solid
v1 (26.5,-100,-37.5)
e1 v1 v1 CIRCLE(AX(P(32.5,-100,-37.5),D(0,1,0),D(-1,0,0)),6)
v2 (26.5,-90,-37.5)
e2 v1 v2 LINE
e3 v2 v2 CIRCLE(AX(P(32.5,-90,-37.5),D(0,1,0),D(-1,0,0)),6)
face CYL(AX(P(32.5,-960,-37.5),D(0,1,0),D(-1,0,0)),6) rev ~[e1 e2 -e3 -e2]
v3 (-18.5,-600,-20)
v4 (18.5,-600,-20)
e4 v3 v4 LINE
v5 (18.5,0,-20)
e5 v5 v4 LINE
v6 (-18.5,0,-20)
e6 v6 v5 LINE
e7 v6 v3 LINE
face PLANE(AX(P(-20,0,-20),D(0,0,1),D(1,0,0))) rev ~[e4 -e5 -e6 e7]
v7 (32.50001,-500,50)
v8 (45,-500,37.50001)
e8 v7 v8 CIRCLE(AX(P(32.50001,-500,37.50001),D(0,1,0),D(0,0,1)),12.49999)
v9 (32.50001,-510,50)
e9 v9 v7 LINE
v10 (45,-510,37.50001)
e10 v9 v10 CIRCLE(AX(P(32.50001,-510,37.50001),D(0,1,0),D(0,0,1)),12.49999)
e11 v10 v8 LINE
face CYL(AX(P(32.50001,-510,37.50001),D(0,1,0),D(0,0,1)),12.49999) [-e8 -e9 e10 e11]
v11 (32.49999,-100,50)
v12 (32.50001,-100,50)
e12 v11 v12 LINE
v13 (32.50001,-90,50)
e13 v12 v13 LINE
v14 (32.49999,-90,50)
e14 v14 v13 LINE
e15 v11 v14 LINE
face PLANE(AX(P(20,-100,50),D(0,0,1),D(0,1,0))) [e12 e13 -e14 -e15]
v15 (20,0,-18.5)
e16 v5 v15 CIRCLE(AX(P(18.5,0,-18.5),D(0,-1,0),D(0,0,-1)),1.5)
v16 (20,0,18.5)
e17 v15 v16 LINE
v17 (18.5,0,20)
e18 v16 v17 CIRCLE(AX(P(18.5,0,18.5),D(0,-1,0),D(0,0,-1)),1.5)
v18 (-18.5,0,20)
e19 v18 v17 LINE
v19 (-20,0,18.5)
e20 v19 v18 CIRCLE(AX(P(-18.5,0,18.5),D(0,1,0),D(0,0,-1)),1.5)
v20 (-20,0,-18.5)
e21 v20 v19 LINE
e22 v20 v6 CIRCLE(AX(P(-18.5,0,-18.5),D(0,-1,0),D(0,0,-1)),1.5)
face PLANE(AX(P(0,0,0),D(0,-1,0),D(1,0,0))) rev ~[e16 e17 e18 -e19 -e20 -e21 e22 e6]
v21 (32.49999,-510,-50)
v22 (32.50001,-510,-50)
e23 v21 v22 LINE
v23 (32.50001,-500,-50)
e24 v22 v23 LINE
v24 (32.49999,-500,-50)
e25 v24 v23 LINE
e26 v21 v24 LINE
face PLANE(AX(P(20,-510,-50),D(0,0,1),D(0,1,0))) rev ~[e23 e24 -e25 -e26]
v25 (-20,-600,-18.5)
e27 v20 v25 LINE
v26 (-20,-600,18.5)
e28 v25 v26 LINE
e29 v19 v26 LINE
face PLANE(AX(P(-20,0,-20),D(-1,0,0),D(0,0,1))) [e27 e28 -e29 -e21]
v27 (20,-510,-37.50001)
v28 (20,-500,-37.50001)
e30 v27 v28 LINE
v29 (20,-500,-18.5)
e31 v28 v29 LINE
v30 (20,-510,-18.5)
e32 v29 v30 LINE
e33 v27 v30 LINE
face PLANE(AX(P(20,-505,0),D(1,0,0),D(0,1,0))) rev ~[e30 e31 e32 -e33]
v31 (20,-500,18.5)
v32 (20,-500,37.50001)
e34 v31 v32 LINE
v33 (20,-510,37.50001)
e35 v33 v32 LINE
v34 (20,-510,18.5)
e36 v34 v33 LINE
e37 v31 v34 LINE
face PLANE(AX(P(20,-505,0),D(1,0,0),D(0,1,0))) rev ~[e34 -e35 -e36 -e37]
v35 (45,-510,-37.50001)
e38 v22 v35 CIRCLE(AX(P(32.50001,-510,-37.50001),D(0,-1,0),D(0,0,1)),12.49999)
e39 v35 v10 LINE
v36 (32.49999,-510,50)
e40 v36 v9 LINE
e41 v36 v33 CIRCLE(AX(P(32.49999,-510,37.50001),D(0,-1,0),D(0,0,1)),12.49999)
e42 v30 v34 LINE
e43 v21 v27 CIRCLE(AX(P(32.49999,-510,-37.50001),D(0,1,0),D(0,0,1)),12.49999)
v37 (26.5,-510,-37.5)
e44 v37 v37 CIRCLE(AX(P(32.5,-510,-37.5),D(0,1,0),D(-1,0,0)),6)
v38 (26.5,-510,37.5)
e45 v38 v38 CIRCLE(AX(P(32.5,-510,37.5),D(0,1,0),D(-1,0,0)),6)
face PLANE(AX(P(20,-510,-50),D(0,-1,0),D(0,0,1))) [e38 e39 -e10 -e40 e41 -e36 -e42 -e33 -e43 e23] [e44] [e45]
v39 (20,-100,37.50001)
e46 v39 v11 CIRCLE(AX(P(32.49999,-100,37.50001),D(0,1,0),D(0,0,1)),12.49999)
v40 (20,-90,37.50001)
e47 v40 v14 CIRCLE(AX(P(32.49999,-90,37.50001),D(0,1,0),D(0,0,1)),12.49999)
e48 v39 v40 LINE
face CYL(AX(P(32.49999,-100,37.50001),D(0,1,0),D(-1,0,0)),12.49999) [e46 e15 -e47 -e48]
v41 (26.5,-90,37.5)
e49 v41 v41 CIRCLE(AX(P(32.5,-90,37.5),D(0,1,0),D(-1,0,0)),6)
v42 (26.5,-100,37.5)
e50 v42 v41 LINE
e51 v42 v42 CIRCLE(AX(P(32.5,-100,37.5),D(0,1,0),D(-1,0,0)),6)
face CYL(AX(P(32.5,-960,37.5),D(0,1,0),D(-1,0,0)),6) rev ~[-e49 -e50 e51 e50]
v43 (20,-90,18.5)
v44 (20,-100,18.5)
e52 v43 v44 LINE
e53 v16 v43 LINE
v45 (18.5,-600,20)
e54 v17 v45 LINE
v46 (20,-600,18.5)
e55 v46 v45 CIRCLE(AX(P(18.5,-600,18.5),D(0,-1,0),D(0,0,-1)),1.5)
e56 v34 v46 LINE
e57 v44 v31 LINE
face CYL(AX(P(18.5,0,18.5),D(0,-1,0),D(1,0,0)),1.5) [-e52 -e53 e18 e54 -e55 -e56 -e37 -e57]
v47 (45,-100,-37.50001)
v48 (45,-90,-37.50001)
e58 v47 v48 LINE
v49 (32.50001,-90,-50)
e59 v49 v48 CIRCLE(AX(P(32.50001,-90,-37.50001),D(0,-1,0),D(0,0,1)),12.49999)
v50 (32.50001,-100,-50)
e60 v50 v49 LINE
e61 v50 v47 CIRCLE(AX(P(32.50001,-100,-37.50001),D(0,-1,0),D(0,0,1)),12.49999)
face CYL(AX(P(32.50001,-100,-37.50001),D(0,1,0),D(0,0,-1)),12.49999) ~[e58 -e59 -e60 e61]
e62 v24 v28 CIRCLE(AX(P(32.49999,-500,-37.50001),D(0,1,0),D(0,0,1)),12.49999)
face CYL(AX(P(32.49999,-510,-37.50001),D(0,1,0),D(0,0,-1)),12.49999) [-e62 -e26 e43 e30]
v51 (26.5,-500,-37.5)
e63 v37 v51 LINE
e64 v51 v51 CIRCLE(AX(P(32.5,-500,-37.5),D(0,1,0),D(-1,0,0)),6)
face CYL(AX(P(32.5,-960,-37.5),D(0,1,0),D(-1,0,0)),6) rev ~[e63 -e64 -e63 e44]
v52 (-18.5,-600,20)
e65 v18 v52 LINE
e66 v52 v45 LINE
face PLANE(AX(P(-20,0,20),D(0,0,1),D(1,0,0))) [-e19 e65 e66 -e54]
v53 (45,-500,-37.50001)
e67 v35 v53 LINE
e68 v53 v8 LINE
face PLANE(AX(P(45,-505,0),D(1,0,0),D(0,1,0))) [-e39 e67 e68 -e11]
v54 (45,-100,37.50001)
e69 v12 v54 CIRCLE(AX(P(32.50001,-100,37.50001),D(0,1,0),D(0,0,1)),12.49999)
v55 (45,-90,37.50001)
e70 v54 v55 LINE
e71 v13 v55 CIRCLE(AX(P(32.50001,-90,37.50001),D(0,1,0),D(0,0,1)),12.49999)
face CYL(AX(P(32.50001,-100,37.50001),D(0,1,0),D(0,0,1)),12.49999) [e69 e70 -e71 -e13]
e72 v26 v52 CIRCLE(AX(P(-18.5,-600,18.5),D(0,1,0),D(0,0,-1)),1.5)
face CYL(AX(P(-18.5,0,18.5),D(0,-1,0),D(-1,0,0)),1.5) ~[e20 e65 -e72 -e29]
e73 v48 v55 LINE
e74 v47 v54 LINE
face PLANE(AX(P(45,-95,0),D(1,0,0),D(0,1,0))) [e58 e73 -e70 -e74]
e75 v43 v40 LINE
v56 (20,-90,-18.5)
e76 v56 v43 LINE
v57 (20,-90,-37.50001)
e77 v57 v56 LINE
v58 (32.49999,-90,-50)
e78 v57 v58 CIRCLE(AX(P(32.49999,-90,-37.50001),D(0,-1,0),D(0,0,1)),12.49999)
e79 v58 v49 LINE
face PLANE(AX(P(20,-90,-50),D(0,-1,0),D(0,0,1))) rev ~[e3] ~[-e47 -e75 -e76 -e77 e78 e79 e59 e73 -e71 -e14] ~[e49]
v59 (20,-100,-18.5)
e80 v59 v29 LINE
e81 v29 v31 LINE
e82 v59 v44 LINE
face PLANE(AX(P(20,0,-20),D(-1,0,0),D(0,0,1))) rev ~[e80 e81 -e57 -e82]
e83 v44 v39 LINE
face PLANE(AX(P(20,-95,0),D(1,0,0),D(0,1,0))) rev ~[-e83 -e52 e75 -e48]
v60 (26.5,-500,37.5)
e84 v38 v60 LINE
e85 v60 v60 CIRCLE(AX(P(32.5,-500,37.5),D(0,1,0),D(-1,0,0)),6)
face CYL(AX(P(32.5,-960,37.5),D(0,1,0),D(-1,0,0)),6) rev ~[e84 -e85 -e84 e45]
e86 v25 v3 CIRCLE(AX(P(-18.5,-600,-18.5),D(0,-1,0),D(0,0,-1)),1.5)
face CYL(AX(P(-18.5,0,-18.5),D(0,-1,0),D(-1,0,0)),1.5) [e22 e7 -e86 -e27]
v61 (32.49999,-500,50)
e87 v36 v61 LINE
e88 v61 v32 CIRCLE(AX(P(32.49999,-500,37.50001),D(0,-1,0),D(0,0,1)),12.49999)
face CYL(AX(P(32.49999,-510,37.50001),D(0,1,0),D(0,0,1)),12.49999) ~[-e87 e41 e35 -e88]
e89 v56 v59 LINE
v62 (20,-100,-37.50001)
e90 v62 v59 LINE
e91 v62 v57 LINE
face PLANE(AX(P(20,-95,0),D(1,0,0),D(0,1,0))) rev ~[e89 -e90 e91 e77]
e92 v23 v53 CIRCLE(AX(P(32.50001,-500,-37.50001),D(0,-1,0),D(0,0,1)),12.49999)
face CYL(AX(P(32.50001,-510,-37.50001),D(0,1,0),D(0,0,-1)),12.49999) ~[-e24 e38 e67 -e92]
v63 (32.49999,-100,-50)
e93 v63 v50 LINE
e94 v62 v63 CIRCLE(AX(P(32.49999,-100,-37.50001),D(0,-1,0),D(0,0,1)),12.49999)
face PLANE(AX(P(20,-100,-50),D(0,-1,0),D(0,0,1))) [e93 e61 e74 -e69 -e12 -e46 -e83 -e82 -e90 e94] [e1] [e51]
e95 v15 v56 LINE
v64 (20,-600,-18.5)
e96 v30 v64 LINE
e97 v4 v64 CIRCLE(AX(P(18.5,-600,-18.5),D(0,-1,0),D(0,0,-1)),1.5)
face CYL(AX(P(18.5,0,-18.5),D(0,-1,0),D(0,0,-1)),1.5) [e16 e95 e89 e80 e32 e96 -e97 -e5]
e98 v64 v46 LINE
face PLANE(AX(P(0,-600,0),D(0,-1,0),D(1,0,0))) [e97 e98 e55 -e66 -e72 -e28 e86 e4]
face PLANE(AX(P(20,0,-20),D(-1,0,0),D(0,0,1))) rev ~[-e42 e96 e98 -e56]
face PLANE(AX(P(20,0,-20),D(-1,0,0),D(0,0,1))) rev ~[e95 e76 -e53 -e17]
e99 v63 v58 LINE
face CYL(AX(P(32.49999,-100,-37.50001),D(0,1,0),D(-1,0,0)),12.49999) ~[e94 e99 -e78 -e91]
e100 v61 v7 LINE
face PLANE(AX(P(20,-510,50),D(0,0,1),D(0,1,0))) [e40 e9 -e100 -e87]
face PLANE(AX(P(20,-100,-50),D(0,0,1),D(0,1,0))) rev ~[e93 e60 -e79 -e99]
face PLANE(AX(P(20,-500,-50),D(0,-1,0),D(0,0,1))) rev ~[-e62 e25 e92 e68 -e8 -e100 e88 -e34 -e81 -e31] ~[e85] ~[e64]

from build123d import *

# Parameters (mm, degrees)
F0_W     = 40
F0_H     = 40
F1_DEPTH = 600
F2_R     = 1.5
F3_W     = 10
F3_H     = 100
F4_DEPTH = 25
F5_R     = 12.49999
F7_D     = 12
F7_DEPTH = 450
F7_TIP   = 3.6051637142


# Not quite as in the source:
# - a fillet or chamfer is up to 0.001 mm smaller than in the source, because OpenCascade refuses the exact size


with BuildPart() as f1:
    # F0 (on Front) → F1 (new body)
    with BuildSketch(Plane.XZ):
        Rectangle(F0_W, F0_H)
    extrude(amount=F1_DEPTH)

    # F2
    f2_edges = [f1.edges().sort_by_distance(p)[0] for p in [
        (-20, -300, 20),
        (-20, -300, -20),
        (20, -300, 20),
        (20, -300, -20),
    ]]
    fillet(f2_edges, radius=F2_R)

    # F3 (on face) → F4 (join)
    with BuildSketch(Plane.YZ.offset(20)):
        with Locations((-505, 0)):
            Rectangle(F3_W, F3_H)
        with Locations((-95, 0)):
            Rectangle(F3_W, F3_H)
    extrude(amount=F4_DEPTH)

    # F5 (radius 12.5 in the source; OpenCascade refuses exactly that, so slightly less here)
    f5_edges = [f1.edges().sort_by_distance(p)[0] for p in [
        (45, -505, 50),
        (20, -505, 50),
        (45, -95, 50),
        (20, -95, 50),
        (45, -95, -50),
        (45, -505, -50),
        (20, -505, -50),
        (20, -95, -50),
    ]]
    fillet(f5_edges, radius=F5_R)

    # F7
    with Locations(Plane.XZ.offset(510)):
        with Locations((32.5, 37.5), (32.5, -37.5)):
            Hole(F7_D / 2, depth=F7_DEPTH)
            with Locations((0, 0, -(F7_DEPTH + F7_TIP / 2))):  # 118° drill point
                Cone(0, F7_D / 2, F7_TIP, mode=Mode.SUBTRACT)


solid = f1.part
